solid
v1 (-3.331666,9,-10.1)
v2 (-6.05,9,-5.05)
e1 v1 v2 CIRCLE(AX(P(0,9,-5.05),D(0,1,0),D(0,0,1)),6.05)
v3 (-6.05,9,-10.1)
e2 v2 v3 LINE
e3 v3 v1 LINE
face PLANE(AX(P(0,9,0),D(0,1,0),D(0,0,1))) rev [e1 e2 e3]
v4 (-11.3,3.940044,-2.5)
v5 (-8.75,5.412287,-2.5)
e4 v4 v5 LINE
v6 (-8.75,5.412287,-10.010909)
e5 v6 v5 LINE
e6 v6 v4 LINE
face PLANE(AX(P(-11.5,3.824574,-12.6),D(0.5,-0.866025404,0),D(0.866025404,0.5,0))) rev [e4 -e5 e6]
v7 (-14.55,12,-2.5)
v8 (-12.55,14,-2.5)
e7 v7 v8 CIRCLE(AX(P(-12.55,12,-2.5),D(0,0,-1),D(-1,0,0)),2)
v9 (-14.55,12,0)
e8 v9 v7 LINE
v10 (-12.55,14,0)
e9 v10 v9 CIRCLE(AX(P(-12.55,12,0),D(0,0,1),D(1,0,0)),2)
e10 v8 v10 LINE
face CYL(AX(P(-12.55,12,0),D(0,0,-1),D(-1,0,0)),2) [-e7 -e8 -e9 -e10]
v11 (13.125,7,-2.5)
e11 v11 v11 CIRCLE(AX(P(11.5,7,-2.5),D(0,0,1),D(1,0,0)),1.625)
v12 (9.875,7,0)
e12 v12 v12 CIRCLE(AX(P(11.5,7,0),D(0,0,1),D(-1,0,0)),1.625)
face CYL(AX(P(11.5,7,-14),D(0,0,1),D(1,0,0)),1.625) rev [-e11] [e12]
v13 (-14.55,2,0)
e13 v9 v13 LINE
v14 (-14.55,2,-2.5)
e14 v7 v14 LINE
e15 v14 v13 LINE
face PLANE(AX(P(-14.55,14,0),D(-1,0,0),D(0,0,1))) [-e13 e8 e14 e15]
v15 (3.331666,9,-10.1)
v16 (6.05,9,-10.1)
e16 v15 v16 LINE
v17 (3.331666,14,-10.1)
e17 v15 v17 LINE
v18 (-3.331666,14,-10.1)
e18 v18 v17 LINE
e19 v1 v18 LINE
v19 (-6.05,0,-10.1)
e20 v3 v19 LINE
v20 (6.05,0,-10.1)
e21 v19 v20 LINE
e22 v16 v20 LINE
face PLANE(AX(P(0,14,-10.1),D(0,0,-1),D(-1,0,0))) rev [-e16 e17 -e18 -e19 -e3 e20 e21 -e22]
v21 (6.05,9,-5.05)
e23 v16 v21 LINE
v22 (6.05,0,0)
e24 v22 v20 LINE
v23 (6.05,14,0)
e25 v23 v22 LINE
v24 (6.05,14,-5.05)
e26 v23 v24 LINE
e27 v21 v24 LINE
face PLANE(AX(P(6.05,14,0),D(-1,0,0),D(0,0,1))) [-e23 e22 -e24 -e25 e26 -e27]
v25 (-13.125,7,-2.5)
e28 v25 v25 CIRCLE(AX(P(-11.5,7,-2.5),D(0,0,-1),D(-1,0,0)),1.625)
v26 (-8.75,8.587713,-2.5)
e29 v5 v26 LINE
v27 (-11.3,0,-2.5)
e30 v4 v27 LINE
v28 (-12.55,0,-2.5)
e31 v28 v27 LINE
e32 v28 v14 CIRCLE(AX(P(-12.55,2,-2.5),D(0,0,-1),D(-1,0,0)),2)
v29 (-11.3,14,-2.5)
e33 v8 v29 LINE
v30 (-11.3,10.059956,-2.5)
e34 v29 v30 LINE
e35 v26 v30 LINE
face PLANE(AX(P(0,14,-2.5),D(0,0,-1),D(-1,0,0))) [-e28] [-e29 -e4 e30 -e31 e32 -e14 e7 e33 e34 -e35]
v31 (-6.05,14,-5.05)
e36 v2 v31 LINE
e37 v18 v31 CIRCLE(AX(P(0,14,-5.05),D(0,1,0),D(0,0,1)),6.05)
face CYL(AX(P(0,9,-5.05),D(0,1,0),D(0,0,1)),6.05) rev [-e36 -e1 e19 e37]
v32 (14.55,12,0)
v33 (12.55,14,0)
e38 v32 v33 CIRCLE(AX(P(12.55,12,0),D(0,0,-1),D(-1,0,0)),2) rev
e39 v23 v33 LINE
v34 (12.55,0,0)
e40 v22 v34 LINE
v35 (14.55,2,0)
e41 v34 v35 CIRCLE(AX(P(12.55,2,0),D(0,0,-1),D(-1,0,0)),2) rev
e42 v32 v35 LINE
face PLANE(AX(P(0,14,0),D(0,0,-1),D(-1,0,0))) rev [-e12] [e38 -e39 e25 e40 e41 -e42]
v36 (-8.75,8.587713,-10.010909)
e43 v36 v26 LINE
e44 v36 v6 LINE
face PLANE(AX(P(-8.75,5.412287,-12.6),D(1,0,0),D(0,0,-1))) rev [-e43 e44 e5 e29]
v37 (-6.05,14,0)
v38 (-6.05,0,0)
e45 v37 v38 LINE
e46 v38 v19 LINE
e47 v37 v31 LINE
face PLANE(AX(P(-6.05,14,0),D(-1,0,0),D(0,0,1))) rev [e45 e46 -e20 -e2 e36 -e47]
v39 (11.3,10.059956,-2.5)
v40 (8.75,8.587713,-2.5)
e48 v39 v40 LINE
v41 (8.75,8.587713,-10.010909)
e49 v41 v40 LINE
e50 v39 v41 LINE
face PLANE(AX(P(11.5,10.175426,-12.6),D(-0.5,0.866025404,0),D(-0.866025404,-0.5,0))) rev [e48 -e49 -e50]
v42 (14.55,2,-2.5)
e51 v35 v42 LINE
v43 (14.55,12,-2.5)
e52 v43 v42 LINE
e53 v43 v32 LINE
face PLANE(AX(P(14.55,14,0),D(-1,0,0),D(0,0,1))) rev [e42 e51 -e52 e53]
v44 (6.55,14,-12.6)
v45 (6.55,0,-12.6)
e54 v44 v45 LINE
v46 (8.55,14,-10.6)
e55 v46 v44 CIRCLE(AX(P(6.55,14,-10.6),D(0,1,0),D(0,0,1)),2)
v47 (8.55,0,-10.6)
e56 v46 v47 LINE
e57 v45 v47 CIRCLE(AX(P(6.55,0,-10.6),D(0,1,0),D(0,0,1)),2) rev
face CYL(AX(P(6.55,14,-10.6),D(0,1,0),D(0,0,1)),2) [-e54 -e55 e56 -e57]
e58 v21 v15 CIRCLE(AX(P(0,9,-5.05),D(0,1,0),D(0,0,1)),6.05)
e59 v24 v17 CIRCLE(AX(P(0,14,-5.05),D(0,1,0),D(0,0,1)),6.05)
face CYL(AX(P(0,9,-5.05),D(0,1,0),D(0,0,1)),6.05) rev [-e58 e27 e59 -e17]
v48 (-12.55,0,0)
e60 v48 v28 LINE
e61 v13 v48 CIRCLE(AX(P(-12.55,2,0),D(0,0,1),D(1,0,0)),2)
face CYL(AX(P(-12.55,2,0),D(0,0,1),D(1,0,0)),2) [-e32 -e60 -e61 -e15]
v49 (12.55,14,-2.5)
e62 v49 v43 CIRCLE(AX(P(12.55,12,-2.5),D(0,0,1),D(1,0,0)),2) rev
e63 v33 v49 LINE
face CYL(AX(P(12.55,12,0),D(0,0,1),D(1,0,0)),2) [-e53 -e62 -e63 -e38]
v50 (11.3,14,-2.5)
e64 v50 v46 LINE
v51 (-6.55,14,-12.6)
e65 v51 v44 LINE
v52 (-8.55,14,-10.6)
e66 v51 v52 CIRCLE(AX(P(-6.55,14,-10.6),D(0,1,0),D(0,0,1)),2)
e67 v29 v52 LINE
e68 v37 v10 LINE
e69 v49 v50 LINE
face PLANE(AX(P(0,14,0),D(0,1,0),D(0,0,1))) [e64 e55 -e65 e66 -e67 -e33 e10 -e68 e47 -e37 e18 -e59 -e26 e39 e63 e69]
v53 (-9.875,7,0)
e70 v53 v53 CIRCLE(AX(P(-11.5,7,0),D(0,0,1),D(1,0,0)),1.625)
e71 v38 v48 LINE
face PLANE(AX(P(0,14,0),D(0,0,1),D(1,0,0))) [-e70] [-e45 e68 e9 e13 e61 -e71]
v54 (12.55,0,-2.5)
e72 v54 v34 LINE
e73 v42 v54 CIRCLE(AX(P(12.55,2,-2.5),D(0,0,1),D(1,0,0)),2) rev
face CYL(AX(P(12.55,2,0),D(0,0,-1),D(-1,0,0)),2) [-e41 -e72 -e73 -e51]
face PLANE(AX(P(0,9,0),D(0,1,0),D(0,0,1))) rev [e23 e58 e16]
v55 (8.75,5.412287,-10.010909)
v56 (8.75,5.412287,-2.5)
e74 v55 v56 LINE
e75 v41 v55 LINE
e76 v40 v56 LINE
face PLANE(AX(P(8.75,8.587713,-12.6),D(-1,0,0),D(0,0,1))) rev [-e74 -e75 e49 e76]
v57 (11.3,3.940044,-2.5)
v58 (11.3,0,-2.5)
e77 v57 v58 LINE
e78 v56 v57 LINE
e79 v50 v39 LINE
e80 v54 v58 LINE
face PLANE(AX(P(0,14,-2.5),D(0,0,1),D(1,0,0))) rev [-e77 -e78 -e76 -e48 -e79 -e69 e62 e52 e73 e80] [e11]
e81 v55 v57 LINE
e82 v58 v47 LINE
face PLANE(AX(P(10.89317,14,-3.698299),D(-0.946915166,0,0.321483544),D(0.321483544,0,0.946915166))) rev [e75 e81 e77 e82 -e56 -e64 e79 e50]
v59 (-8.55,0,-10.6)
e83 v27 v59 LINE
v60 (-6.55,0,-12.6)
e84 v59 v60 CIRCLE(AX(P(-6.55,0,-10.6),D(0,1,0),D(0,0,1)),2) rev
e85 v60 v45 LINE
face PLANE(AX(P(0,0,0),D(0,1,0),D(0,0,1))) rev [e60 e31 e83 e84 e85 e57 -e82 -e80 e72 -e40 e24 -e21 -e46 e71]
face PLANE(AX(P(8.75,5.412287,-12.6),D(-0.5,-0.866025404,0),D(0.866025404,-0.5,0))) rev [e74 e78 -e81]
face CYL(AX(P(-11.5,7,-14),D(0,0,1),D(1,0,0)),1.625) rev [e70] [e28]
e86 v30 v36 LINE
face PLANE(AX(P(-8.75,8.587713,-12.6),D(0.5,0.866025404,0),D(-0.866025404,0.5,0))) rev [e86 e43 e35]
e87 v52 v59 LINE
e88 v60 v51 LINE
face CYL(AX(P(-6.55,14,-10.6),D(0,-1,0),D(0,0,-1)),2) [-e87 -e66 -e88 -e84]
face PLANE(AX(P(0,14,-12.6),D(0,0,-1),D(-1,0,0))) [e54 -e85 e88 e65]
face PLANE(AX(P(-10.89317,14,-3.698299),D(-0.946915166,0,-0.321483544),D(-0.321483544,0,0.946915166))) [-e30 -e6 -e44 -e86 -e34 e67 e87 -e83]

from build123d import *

# Parameters (mm, degrees)
CUERPO_BASE_DEPTH          = 14
CROQUIS2_R                 = 1.625
AGUJEROS_DE_SUJECION_DEPTH = 14
TUERCAS_START              = -2.5
TUERCAS_DEPTH              = 22.300472684
REDONDEO_BORDES_R          = 2
SALIENTE_EXTRUIR2_DEPTH    = 5


with BuildPart() as part:
    # Croquis1 → Cuerpo Base (new body)
    with BuildSketch(Plane(origin=(0, 0, 0), x_dir=(1, 0, 0), z_dir=(0, 1, 0))):
        Polygon((-14.55, 0), (-6.05, 0), (-6.05, 10.1), (0, 10.1), (0, 12.6), (-8.55, 12.6), (-8.55, 10.6), (-8.55, 2.5), (-11.3, 2.5), (-14.55, 2.5), align=None)
        Polygon((-8.55, 10.6), (-11.3, 2.5), (-8.55, 2.5), align=None)
        Polygon((0, 12.6), (0, 10.1), (6.05, 10.1), (6.05, 0), (14.55, 0), (14.55, 2.5), (11.3, 2.5), (8.55, 2.5), (8.55, 10.6), (8.55, 12.6), align=None)
        Polygon((11.3, 2.5), (8.55, 10.6), (8.55, 2.5), align=None)
    extrude(amount=CUERPO_BASE_DEPTH)

    # Croquis2 → Agujeros de sujecion (cut)
    with BuildSketch(Plane.XY):
        with Locations((-11.5, 7)):
            Circle(CROQUIS2_R)
        with Locations(Location((11.5, 7, 0), (0, 0, 97.069714042))):
            Circle(CROQUIS2_R)
    extrude(amount=-AGUJEROS_DE_SUJECION_DEPTH, mode=Mode.SUBTRACT)

    # Croquis3 → Tuercas (cut, through all)
    with BuildSketch(Plane.XY.offset(TUERCAS_START)):
        Polygon((-14.25, 5.41228676), (-11.5, 3.824573519), (-8.75, 5.41228676), (-8.75, 8.58771324), (-11.5, 10.175426481), (-14.25, 8.58771324), align=None)
        Polygon((11.5, 3.824573519), (14.25, 5.41228676), (14.25, 8.58771324), (11.5, 10.175426481), (8.75, 8.58771324), (8.75, 5.41228676), align=None)
    extrude(amount=-TUERCAS_DEPTH, mode=Mode.SUBTRACT)

    # Redondeo bordes
    redondeo_bordes_edges = [part.edges().sort_by_distance(p)[0] for p in [
        (-8.55, 7, -12.6),
        (8.55, 7, -12.6),
        (14.55, 0, -1.25),
        (14.55, 14, -1.25),
        (-14.55, 0, -1.25),
        (-14.55, 14, -1.25),
    ]]
    fillet(redondeo_bordes_edges, radius=REDONDEO_BORDES_R - 0.0001)  # a hair under: the kernel refuses the full size

    # Croquis4 → Saliente-Extruir2 (add)
    with BuildSketch(Plane(origin=(0, 14, 0), x_dir=(1, 0, 0), z_dir=(0, 1, 0))):
        with BuildLine():
            Line((-3.33166625, 10.1), (-6.05, 10.1))
            Line((-6.05, 10.1), (-6.05, 5.05))
            ThreePointArc((-6.05, 5.05), (-5.327245105, 7.917570329), (-3.33166625, 10.1))
        make_face()
        with BuildLine():
            Line((6.05, 10.1), (3.33166625, 10.1))
            ThreePointArc((3.33166625, 10.1), (5.327245105, 7.917570329), (6.05, 5.05))
            Line((6.05, 5.05), (6.05, 10.1))
        make_face()
    extrude(amount=-SALIENTE_EXTRUIR2_DEPTH)


solid = part.part
